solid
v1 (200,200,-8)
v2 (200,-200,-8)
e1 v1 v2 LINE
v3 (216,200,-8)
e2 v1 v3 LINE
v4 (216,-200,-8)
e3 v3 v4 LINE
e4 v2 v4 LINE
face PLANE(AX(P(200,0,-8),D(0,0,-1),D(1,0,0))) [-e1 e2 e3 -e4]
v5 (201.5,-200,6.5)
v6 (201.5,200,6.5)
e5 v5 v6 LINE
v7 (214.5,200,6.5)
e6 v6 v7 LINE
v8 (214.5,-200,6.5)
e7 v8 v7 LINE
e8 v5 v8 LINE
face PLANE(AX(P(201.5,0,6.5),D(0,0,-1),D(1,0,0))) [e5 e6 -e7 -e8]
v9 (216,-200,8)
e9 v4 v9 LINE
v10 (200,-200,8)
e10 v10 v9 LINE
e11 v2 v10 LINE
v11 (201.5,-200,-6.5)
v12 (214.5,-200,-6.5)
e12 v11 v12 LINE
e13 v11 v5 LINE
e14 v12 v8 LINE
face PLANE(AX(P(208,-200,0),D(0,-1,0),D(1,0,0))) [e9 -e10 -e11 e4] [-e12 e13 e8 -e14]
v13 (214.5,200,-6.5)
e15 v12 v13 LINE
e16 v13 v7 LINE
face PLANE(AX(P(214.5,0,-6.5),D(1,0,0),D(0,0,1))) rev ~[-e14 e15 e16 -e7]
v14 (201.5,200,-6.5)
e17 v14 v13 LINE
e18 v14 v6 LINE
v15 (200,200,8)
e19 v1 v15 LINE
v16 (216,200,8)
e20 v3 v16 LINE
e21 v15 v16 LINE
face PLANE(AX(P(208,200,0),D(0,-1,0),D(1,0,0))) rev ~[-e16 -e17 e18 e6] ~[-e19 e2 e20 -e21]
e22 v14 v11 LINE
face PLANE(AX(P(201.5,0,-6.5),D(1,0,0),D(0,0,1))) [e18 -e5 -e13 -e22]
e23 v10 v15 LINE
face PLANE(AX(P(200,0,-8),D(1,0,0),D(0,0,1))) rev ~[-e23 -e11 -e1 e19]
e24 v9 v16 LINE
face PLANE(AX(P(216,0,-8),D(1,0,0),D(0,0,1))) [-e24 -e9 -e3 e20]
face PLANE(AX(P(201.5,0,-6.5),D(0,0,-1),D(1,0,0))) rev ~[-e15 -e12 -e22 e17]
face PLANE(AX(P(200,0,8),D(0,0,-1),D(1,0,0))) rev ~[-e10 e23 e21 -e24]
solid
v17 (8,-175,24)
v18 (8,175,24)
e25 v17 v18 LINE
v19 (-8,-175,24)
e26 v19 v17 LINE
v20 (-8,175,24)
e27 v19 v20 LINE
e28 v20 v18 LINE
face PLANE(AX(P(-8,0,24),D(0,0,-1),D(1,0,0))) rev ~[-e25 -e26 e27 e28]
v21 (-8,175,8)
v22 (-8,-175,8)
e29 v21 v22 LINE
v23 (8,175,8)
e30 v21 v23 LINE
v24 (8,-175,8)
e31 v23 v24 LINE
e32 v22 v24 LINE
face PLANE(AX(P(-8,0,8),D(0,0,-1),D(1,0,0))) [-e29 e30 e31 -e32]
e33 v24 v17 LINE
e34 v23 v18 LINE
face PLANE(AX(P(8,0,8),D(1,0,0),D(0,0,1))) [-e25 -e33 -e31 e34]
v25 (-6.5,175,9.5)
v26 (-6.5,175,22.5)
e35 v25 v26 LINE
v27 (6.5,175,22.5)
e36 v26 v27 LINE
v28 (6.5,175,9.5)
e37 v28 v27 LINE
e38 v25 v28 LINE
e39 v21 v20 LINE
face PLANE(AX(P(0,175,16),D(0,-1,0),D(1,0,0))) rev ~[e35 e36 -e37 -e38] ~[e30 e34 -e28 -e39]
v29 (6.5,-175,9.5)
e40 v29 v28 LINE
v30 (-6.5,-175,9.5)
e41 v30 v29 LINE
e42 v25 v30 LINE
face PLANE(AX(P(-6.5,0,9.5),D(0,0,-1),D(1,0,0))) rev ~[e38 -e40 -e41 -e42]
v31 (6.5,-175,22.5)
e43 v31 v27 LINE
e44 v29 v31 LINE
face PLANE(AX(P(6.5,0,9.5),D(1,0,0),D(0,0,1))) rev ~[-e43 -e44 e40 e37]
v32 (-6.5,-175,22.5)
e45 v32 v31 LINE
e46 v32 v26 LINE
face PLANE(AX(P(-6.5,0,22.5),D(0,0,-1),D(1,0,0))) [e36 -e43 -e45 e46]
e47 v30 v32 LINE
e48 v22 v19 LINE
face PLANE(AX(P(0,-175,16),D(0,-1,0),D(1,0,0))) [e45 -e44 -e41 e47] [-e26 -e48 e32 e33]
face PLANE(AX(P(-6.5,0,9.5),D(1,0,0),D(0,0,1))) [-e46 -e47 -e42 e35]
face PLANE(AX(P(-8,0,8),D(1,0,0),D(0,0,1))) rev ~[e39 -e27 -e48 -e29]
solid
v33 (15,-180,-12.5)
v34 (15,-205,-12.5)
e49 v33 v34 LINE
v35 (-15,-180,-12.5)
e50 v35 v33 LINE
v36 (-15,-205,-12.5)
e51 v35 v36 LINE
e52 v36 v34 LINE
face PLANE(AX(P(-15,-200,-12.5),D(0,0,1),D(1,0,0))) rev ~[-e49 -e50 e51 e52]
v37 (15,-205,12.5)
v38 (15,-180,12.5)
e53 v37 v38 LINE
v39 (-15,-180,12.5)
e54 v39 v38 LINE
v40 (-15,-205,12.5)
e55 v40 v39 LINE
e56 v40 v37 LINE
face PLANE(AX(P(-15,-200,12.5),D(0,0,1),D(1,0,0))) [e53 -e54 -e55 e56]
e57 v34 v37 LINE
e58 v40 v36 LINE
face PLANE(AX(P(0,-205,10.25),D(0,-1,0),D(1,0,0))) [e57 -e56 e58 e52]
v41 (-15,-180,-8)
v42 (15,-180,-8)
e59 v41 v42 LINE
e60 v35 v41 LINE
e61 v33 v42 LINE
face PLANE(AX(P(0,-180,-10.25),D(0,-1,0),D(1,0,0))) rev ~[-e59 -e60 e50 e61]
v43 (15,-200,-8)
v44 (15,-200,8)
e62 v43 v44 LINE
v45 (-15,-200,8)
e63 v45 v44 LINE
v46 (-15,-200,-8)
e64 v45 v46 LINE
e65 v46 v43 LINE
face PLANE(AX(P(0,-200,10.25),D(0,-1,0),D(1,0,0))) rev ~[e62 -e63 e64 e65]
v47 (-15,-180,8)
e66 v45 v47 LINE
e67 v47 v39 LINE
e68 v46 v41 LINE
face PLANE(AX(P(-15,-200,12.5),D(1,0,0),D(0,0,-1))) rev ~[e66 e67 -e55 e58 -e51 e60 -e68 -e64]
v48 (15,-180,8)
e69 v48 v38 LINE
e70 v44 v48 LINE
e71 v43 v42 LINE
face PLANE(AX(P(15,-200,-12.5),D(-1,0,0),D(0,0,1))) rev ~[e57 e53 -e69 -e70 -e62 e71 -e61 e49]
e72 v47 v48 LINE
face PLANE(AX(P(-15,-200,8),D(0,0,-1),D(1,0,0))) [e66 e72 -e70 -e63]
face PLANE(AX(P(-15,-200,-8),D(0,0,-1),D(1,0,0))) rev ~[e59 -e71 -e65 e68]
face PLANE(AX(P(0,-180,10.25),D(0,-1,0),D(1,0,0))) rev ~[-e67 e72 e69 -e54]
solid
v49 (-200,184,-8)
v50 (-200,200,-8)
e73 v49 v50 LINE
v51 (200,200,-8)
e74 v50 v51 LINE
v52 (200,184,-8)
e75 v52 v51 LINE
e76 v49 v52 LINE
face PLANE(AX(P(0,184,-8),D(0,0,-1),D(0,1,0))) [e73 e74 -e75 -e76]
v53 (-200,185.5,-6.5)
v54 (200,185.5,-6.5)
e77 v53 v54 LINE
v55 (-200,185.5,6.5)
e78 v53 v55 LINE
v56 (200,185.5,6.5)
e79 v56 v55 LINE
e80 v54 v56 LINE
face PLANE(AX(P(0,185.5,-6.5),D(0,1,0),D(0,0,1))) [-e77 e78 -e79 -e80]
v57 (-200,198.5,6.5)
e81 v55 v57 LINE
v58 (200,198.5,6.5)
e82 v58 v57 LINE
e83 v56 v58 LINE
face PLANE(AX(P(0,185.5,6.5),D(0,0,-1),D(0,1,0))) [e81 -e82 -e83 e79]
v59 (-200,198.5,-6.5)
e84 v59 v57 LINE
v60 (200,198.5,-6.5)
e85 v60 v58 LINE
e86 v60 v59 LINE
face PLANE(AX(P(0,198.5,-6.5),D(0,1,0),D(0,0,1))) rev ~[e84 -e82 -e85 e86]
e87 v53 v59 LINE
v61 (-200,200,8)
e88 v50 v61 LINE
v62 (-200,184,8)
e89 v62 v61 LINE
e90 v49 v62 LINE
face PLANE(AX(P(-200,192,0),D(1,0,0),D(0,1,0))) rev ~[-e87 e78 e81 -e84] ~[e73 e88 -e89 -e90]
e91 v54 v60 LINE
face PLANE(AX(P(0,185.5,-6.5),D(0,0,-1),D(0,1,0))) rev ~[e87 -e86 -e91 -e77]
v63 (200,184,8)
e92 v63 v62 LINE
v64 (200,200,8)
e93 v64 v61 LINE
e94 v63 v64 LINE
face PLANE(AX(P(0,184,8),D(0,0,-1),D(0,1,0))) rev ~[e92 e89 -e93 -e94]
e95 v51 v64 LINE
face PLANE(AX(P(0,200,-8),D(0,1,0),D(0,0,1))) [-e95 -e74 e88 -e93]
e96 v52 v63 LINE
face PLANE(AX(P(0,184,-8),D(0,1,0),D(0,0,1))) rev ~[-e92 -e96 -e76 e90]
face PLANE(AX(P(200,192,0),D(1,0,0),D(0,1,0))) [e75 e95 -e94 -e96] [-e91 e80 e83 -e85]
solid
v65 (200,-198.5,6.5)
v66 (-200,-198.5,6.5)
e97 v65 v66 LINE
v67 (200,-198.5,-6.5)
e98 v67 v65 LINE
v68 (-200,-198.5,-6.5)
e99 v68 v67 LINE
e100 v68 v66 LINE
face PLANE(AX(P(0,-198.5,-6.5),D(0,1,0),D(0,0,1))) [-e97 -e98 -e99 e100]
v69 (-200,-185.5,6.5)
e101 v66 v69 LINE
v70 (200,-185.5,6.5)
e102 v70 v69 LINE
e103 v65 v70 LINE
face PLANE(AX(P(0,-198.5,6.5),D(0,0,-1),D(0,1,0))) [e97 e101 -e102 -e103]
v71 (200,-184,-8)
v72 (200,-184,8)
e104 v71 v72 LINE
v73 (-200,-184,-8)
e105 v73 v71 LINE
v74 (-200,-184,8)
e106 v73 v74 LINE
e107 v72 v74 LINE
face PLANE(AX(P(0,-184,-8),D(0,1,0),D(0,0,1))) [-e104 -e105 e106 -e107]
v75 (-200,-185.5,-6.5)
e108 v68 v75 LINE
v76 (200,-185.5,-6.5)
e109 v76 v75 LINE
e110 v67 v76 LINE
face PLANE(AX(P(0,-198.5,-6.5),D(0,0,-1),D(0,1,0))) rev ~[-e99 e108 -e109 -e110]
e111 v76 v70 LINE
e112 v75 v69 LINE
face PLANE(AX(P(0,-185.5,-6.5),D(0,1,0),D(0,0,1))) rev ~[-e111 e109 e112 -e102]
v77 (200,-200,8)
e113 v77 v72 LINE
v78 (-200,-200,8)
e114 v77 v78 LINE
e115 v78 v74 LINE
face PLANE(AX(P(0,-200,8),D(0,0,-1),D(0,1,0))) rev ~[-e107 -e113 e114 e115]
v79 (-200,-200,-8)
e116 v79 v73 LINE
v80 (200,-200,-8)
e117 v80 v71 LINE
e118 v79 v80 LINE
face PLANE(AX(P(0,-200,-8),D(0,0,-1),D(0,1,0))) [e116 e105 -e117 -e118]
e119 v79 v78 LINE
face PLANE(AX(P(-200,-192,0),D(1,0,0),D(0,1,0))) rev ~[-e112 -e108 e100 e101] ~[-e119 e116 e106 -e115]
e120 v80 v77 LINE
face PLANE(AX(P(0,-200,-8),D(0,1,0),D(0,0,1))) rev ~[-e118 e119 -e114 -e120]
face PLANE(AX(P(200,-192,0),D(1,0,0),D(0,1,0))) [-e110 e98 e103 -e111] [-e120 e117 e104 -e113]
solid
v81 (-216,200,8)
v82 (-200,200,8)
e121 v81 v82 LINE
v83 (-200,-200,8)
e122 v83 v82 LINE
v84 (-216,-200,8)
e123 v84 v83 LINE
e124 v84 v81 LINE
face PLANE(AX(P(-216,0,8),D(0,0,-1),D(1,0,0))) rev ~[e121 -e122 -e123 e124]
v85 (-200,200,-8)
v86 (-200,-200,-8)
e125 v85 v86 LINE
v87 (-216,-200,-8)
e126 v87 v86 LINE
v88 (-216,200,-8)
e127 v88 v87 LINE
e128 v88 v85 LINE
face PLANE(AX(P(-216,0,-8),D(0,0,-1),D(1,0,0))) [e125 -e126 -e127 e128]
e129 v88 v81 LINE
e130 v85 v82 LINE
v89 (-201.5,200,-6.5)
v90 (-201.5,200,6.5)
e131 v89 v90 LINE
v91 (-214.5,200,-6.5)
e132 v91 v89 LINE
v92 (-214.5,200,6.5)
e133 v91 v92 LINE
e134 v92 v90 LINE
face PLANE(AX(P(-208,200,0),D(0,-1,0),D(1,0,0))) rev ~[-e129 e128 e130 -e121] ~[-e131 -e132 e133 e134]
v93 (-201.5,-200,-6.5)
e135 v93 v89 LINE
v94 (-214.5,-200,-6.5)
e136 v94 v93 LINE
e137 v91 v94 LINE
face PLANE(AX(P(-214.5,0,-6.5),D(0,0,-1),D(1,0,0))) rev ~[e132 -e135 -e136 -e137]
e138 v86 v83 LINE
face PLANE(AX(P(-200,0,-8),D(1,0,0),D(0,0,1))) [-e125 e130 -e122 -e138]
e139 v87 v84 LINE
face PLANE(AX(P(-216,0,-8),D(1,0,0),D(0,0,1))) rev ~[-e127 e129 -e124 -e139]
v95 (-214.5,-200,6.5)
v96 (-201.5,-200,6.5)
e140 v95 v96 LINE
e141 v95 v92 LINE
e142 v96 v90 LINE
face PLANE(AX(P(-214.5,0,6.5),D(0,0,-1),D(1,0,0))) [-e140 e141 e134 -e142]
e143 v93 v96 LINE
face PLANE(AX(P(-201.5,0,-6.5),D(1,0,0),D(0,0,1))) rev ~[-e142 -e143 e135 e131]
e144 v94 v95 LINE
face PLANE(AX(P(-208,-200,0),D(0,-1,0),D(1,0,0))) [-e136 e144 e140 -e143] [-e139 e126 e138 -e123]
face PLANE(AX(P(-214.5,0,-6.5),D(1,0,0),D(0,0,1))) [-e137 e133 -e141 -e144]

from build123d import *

# Parameters (mm, degrees)
F0_W          = 16
F0_H          = 16
F0_W_2        = 13
F0_H_2        = 13
F1_DEPTH      = 200
F2_W          = 16
F2_H          = 16
F2_W_2        = 13
F2_H_2        = 13
F3_DEPTH      = 200
F3_DEPTH_BACK = 200
F5_W          = 16
F5_H          = 16
F5_W_2        = 13
F5_H_2        = 13
F6_DEPTH      = 175
F7_W          = 30
F7_H          = 4.5
F8_DEPTH      = 20
F7_H_2        = 16
F9_DEPTH      = 5


with BuildPart() as f1:
    # F0 (on Front) → F1 (new body, symmetric)
    with BuildSketch(Plane.XZ):
        with Locations((-208, 0)):
            Rectangle(F0_W, F0_H)
        with Locations((-208, 0)):
            Rectangle(F0_W_2, F0_H_2, mode=Mode.SUBTRACT)
    extrude(amount=F1_DEPTH, both=True)


with BuildPart() as f1b:
    # F0 (on Front) → F1, piece 2 (new body, symmetric)
    with BuildSketch(Plane.XZ):
        with Locations((208, 0)):
            Rectangle(F0_W, F0_H)
        with Locations((208, 0)):
            Rectangle(F0_W_2, F0_H_2, mode=Mode.SUBTRACT)
    extrude(amount=F1_DEPTH, both=True)


with BuildPart() as f3:
    # F2 (on Right) → F3 (new body, two sides)
    with BuildSketch(Plane.YZ) as f3_sk:
        with Locations((-192, 0)):
            Rectangle(F2_W, F2_H)
        with Locations((-192, 0)):
            Rectangle(F2_W_2, F2_H_2, mode=Mode.SUBTRACT)
    extrude(amount=F3_DEPTH)
    extrude(f3_sk.sketch, amount=-F3_DEPTH_BACK)


with BuildPart() as f3b:
    # F2 (on Right) → F3, piece 2 (new body, two sides)
    with BuildSketch(Plane.YZ) as f3_2_sk:
        with Locations((192, 0)):
            Rectangle(F2_W, F2_H)
        with Locations((192, 0)):
            Rectangle(F2_W_2, F2_H_2, mode=Mode.SUBTRACT)
    extrude(amount=F3_DEPTH)
    extrude(f3_2_sk.sketch, amount=-F3_DEPTH_BACK)


with BuildPart() as f6:
    # F5 (on Front) → F6 (new body, symmetric)
    with BuildSketch(Plane.XZ):
        with Locations((2e-10, 16)):
            Rectangle(F5_W, F5_H)
        with Locations((2e-10, 16)):
            Rectangle(F5_W_2, F5_H_2, mode=Mode.SUBTRACT)
    extrude(amount=F6_DEPTH, both=True)


with BuildPart() as f8:
    # F7 (on face) → F8 (new body)
    with BuildSketch(Plane.XZ.offset(200)):
        with Locations((0, 10.25)):
            Rectangle(F7_W, F7_H)
    extrude(amount=-F8_DEPTH)



with BuildPart() as f8b:
    # F7 (on face) → F8, piece 2 (new body)
    with BuildSketch(Plane.XZ.offset(200)):
        with Locations((0, -10.25)):
            Rectangle(F7_W, F7_H)
    extrude(amount=-F8_DEPTH)


with BuildPart() as f8_1:
    add(f8.part)

    add(f8b.part)  # F9 merges F8b
    # F7 (on face) → F9 (join)
    with BuildSketch(Plane.XZ.offset(200)):
        with Locations((0, 10.25)):
            Rectangle(F7_W, F7_H)
        Rectangle(F7_W, F7_H_2)
        with Locations((0, -10.25)):
            Rectangle(F7_W, F7_H)
    extrude(amount=F9_DEPTH)


solid = Compound([f1.part, f1b.part, f3.part, f3b.part, f6.part, f8_1.part])
